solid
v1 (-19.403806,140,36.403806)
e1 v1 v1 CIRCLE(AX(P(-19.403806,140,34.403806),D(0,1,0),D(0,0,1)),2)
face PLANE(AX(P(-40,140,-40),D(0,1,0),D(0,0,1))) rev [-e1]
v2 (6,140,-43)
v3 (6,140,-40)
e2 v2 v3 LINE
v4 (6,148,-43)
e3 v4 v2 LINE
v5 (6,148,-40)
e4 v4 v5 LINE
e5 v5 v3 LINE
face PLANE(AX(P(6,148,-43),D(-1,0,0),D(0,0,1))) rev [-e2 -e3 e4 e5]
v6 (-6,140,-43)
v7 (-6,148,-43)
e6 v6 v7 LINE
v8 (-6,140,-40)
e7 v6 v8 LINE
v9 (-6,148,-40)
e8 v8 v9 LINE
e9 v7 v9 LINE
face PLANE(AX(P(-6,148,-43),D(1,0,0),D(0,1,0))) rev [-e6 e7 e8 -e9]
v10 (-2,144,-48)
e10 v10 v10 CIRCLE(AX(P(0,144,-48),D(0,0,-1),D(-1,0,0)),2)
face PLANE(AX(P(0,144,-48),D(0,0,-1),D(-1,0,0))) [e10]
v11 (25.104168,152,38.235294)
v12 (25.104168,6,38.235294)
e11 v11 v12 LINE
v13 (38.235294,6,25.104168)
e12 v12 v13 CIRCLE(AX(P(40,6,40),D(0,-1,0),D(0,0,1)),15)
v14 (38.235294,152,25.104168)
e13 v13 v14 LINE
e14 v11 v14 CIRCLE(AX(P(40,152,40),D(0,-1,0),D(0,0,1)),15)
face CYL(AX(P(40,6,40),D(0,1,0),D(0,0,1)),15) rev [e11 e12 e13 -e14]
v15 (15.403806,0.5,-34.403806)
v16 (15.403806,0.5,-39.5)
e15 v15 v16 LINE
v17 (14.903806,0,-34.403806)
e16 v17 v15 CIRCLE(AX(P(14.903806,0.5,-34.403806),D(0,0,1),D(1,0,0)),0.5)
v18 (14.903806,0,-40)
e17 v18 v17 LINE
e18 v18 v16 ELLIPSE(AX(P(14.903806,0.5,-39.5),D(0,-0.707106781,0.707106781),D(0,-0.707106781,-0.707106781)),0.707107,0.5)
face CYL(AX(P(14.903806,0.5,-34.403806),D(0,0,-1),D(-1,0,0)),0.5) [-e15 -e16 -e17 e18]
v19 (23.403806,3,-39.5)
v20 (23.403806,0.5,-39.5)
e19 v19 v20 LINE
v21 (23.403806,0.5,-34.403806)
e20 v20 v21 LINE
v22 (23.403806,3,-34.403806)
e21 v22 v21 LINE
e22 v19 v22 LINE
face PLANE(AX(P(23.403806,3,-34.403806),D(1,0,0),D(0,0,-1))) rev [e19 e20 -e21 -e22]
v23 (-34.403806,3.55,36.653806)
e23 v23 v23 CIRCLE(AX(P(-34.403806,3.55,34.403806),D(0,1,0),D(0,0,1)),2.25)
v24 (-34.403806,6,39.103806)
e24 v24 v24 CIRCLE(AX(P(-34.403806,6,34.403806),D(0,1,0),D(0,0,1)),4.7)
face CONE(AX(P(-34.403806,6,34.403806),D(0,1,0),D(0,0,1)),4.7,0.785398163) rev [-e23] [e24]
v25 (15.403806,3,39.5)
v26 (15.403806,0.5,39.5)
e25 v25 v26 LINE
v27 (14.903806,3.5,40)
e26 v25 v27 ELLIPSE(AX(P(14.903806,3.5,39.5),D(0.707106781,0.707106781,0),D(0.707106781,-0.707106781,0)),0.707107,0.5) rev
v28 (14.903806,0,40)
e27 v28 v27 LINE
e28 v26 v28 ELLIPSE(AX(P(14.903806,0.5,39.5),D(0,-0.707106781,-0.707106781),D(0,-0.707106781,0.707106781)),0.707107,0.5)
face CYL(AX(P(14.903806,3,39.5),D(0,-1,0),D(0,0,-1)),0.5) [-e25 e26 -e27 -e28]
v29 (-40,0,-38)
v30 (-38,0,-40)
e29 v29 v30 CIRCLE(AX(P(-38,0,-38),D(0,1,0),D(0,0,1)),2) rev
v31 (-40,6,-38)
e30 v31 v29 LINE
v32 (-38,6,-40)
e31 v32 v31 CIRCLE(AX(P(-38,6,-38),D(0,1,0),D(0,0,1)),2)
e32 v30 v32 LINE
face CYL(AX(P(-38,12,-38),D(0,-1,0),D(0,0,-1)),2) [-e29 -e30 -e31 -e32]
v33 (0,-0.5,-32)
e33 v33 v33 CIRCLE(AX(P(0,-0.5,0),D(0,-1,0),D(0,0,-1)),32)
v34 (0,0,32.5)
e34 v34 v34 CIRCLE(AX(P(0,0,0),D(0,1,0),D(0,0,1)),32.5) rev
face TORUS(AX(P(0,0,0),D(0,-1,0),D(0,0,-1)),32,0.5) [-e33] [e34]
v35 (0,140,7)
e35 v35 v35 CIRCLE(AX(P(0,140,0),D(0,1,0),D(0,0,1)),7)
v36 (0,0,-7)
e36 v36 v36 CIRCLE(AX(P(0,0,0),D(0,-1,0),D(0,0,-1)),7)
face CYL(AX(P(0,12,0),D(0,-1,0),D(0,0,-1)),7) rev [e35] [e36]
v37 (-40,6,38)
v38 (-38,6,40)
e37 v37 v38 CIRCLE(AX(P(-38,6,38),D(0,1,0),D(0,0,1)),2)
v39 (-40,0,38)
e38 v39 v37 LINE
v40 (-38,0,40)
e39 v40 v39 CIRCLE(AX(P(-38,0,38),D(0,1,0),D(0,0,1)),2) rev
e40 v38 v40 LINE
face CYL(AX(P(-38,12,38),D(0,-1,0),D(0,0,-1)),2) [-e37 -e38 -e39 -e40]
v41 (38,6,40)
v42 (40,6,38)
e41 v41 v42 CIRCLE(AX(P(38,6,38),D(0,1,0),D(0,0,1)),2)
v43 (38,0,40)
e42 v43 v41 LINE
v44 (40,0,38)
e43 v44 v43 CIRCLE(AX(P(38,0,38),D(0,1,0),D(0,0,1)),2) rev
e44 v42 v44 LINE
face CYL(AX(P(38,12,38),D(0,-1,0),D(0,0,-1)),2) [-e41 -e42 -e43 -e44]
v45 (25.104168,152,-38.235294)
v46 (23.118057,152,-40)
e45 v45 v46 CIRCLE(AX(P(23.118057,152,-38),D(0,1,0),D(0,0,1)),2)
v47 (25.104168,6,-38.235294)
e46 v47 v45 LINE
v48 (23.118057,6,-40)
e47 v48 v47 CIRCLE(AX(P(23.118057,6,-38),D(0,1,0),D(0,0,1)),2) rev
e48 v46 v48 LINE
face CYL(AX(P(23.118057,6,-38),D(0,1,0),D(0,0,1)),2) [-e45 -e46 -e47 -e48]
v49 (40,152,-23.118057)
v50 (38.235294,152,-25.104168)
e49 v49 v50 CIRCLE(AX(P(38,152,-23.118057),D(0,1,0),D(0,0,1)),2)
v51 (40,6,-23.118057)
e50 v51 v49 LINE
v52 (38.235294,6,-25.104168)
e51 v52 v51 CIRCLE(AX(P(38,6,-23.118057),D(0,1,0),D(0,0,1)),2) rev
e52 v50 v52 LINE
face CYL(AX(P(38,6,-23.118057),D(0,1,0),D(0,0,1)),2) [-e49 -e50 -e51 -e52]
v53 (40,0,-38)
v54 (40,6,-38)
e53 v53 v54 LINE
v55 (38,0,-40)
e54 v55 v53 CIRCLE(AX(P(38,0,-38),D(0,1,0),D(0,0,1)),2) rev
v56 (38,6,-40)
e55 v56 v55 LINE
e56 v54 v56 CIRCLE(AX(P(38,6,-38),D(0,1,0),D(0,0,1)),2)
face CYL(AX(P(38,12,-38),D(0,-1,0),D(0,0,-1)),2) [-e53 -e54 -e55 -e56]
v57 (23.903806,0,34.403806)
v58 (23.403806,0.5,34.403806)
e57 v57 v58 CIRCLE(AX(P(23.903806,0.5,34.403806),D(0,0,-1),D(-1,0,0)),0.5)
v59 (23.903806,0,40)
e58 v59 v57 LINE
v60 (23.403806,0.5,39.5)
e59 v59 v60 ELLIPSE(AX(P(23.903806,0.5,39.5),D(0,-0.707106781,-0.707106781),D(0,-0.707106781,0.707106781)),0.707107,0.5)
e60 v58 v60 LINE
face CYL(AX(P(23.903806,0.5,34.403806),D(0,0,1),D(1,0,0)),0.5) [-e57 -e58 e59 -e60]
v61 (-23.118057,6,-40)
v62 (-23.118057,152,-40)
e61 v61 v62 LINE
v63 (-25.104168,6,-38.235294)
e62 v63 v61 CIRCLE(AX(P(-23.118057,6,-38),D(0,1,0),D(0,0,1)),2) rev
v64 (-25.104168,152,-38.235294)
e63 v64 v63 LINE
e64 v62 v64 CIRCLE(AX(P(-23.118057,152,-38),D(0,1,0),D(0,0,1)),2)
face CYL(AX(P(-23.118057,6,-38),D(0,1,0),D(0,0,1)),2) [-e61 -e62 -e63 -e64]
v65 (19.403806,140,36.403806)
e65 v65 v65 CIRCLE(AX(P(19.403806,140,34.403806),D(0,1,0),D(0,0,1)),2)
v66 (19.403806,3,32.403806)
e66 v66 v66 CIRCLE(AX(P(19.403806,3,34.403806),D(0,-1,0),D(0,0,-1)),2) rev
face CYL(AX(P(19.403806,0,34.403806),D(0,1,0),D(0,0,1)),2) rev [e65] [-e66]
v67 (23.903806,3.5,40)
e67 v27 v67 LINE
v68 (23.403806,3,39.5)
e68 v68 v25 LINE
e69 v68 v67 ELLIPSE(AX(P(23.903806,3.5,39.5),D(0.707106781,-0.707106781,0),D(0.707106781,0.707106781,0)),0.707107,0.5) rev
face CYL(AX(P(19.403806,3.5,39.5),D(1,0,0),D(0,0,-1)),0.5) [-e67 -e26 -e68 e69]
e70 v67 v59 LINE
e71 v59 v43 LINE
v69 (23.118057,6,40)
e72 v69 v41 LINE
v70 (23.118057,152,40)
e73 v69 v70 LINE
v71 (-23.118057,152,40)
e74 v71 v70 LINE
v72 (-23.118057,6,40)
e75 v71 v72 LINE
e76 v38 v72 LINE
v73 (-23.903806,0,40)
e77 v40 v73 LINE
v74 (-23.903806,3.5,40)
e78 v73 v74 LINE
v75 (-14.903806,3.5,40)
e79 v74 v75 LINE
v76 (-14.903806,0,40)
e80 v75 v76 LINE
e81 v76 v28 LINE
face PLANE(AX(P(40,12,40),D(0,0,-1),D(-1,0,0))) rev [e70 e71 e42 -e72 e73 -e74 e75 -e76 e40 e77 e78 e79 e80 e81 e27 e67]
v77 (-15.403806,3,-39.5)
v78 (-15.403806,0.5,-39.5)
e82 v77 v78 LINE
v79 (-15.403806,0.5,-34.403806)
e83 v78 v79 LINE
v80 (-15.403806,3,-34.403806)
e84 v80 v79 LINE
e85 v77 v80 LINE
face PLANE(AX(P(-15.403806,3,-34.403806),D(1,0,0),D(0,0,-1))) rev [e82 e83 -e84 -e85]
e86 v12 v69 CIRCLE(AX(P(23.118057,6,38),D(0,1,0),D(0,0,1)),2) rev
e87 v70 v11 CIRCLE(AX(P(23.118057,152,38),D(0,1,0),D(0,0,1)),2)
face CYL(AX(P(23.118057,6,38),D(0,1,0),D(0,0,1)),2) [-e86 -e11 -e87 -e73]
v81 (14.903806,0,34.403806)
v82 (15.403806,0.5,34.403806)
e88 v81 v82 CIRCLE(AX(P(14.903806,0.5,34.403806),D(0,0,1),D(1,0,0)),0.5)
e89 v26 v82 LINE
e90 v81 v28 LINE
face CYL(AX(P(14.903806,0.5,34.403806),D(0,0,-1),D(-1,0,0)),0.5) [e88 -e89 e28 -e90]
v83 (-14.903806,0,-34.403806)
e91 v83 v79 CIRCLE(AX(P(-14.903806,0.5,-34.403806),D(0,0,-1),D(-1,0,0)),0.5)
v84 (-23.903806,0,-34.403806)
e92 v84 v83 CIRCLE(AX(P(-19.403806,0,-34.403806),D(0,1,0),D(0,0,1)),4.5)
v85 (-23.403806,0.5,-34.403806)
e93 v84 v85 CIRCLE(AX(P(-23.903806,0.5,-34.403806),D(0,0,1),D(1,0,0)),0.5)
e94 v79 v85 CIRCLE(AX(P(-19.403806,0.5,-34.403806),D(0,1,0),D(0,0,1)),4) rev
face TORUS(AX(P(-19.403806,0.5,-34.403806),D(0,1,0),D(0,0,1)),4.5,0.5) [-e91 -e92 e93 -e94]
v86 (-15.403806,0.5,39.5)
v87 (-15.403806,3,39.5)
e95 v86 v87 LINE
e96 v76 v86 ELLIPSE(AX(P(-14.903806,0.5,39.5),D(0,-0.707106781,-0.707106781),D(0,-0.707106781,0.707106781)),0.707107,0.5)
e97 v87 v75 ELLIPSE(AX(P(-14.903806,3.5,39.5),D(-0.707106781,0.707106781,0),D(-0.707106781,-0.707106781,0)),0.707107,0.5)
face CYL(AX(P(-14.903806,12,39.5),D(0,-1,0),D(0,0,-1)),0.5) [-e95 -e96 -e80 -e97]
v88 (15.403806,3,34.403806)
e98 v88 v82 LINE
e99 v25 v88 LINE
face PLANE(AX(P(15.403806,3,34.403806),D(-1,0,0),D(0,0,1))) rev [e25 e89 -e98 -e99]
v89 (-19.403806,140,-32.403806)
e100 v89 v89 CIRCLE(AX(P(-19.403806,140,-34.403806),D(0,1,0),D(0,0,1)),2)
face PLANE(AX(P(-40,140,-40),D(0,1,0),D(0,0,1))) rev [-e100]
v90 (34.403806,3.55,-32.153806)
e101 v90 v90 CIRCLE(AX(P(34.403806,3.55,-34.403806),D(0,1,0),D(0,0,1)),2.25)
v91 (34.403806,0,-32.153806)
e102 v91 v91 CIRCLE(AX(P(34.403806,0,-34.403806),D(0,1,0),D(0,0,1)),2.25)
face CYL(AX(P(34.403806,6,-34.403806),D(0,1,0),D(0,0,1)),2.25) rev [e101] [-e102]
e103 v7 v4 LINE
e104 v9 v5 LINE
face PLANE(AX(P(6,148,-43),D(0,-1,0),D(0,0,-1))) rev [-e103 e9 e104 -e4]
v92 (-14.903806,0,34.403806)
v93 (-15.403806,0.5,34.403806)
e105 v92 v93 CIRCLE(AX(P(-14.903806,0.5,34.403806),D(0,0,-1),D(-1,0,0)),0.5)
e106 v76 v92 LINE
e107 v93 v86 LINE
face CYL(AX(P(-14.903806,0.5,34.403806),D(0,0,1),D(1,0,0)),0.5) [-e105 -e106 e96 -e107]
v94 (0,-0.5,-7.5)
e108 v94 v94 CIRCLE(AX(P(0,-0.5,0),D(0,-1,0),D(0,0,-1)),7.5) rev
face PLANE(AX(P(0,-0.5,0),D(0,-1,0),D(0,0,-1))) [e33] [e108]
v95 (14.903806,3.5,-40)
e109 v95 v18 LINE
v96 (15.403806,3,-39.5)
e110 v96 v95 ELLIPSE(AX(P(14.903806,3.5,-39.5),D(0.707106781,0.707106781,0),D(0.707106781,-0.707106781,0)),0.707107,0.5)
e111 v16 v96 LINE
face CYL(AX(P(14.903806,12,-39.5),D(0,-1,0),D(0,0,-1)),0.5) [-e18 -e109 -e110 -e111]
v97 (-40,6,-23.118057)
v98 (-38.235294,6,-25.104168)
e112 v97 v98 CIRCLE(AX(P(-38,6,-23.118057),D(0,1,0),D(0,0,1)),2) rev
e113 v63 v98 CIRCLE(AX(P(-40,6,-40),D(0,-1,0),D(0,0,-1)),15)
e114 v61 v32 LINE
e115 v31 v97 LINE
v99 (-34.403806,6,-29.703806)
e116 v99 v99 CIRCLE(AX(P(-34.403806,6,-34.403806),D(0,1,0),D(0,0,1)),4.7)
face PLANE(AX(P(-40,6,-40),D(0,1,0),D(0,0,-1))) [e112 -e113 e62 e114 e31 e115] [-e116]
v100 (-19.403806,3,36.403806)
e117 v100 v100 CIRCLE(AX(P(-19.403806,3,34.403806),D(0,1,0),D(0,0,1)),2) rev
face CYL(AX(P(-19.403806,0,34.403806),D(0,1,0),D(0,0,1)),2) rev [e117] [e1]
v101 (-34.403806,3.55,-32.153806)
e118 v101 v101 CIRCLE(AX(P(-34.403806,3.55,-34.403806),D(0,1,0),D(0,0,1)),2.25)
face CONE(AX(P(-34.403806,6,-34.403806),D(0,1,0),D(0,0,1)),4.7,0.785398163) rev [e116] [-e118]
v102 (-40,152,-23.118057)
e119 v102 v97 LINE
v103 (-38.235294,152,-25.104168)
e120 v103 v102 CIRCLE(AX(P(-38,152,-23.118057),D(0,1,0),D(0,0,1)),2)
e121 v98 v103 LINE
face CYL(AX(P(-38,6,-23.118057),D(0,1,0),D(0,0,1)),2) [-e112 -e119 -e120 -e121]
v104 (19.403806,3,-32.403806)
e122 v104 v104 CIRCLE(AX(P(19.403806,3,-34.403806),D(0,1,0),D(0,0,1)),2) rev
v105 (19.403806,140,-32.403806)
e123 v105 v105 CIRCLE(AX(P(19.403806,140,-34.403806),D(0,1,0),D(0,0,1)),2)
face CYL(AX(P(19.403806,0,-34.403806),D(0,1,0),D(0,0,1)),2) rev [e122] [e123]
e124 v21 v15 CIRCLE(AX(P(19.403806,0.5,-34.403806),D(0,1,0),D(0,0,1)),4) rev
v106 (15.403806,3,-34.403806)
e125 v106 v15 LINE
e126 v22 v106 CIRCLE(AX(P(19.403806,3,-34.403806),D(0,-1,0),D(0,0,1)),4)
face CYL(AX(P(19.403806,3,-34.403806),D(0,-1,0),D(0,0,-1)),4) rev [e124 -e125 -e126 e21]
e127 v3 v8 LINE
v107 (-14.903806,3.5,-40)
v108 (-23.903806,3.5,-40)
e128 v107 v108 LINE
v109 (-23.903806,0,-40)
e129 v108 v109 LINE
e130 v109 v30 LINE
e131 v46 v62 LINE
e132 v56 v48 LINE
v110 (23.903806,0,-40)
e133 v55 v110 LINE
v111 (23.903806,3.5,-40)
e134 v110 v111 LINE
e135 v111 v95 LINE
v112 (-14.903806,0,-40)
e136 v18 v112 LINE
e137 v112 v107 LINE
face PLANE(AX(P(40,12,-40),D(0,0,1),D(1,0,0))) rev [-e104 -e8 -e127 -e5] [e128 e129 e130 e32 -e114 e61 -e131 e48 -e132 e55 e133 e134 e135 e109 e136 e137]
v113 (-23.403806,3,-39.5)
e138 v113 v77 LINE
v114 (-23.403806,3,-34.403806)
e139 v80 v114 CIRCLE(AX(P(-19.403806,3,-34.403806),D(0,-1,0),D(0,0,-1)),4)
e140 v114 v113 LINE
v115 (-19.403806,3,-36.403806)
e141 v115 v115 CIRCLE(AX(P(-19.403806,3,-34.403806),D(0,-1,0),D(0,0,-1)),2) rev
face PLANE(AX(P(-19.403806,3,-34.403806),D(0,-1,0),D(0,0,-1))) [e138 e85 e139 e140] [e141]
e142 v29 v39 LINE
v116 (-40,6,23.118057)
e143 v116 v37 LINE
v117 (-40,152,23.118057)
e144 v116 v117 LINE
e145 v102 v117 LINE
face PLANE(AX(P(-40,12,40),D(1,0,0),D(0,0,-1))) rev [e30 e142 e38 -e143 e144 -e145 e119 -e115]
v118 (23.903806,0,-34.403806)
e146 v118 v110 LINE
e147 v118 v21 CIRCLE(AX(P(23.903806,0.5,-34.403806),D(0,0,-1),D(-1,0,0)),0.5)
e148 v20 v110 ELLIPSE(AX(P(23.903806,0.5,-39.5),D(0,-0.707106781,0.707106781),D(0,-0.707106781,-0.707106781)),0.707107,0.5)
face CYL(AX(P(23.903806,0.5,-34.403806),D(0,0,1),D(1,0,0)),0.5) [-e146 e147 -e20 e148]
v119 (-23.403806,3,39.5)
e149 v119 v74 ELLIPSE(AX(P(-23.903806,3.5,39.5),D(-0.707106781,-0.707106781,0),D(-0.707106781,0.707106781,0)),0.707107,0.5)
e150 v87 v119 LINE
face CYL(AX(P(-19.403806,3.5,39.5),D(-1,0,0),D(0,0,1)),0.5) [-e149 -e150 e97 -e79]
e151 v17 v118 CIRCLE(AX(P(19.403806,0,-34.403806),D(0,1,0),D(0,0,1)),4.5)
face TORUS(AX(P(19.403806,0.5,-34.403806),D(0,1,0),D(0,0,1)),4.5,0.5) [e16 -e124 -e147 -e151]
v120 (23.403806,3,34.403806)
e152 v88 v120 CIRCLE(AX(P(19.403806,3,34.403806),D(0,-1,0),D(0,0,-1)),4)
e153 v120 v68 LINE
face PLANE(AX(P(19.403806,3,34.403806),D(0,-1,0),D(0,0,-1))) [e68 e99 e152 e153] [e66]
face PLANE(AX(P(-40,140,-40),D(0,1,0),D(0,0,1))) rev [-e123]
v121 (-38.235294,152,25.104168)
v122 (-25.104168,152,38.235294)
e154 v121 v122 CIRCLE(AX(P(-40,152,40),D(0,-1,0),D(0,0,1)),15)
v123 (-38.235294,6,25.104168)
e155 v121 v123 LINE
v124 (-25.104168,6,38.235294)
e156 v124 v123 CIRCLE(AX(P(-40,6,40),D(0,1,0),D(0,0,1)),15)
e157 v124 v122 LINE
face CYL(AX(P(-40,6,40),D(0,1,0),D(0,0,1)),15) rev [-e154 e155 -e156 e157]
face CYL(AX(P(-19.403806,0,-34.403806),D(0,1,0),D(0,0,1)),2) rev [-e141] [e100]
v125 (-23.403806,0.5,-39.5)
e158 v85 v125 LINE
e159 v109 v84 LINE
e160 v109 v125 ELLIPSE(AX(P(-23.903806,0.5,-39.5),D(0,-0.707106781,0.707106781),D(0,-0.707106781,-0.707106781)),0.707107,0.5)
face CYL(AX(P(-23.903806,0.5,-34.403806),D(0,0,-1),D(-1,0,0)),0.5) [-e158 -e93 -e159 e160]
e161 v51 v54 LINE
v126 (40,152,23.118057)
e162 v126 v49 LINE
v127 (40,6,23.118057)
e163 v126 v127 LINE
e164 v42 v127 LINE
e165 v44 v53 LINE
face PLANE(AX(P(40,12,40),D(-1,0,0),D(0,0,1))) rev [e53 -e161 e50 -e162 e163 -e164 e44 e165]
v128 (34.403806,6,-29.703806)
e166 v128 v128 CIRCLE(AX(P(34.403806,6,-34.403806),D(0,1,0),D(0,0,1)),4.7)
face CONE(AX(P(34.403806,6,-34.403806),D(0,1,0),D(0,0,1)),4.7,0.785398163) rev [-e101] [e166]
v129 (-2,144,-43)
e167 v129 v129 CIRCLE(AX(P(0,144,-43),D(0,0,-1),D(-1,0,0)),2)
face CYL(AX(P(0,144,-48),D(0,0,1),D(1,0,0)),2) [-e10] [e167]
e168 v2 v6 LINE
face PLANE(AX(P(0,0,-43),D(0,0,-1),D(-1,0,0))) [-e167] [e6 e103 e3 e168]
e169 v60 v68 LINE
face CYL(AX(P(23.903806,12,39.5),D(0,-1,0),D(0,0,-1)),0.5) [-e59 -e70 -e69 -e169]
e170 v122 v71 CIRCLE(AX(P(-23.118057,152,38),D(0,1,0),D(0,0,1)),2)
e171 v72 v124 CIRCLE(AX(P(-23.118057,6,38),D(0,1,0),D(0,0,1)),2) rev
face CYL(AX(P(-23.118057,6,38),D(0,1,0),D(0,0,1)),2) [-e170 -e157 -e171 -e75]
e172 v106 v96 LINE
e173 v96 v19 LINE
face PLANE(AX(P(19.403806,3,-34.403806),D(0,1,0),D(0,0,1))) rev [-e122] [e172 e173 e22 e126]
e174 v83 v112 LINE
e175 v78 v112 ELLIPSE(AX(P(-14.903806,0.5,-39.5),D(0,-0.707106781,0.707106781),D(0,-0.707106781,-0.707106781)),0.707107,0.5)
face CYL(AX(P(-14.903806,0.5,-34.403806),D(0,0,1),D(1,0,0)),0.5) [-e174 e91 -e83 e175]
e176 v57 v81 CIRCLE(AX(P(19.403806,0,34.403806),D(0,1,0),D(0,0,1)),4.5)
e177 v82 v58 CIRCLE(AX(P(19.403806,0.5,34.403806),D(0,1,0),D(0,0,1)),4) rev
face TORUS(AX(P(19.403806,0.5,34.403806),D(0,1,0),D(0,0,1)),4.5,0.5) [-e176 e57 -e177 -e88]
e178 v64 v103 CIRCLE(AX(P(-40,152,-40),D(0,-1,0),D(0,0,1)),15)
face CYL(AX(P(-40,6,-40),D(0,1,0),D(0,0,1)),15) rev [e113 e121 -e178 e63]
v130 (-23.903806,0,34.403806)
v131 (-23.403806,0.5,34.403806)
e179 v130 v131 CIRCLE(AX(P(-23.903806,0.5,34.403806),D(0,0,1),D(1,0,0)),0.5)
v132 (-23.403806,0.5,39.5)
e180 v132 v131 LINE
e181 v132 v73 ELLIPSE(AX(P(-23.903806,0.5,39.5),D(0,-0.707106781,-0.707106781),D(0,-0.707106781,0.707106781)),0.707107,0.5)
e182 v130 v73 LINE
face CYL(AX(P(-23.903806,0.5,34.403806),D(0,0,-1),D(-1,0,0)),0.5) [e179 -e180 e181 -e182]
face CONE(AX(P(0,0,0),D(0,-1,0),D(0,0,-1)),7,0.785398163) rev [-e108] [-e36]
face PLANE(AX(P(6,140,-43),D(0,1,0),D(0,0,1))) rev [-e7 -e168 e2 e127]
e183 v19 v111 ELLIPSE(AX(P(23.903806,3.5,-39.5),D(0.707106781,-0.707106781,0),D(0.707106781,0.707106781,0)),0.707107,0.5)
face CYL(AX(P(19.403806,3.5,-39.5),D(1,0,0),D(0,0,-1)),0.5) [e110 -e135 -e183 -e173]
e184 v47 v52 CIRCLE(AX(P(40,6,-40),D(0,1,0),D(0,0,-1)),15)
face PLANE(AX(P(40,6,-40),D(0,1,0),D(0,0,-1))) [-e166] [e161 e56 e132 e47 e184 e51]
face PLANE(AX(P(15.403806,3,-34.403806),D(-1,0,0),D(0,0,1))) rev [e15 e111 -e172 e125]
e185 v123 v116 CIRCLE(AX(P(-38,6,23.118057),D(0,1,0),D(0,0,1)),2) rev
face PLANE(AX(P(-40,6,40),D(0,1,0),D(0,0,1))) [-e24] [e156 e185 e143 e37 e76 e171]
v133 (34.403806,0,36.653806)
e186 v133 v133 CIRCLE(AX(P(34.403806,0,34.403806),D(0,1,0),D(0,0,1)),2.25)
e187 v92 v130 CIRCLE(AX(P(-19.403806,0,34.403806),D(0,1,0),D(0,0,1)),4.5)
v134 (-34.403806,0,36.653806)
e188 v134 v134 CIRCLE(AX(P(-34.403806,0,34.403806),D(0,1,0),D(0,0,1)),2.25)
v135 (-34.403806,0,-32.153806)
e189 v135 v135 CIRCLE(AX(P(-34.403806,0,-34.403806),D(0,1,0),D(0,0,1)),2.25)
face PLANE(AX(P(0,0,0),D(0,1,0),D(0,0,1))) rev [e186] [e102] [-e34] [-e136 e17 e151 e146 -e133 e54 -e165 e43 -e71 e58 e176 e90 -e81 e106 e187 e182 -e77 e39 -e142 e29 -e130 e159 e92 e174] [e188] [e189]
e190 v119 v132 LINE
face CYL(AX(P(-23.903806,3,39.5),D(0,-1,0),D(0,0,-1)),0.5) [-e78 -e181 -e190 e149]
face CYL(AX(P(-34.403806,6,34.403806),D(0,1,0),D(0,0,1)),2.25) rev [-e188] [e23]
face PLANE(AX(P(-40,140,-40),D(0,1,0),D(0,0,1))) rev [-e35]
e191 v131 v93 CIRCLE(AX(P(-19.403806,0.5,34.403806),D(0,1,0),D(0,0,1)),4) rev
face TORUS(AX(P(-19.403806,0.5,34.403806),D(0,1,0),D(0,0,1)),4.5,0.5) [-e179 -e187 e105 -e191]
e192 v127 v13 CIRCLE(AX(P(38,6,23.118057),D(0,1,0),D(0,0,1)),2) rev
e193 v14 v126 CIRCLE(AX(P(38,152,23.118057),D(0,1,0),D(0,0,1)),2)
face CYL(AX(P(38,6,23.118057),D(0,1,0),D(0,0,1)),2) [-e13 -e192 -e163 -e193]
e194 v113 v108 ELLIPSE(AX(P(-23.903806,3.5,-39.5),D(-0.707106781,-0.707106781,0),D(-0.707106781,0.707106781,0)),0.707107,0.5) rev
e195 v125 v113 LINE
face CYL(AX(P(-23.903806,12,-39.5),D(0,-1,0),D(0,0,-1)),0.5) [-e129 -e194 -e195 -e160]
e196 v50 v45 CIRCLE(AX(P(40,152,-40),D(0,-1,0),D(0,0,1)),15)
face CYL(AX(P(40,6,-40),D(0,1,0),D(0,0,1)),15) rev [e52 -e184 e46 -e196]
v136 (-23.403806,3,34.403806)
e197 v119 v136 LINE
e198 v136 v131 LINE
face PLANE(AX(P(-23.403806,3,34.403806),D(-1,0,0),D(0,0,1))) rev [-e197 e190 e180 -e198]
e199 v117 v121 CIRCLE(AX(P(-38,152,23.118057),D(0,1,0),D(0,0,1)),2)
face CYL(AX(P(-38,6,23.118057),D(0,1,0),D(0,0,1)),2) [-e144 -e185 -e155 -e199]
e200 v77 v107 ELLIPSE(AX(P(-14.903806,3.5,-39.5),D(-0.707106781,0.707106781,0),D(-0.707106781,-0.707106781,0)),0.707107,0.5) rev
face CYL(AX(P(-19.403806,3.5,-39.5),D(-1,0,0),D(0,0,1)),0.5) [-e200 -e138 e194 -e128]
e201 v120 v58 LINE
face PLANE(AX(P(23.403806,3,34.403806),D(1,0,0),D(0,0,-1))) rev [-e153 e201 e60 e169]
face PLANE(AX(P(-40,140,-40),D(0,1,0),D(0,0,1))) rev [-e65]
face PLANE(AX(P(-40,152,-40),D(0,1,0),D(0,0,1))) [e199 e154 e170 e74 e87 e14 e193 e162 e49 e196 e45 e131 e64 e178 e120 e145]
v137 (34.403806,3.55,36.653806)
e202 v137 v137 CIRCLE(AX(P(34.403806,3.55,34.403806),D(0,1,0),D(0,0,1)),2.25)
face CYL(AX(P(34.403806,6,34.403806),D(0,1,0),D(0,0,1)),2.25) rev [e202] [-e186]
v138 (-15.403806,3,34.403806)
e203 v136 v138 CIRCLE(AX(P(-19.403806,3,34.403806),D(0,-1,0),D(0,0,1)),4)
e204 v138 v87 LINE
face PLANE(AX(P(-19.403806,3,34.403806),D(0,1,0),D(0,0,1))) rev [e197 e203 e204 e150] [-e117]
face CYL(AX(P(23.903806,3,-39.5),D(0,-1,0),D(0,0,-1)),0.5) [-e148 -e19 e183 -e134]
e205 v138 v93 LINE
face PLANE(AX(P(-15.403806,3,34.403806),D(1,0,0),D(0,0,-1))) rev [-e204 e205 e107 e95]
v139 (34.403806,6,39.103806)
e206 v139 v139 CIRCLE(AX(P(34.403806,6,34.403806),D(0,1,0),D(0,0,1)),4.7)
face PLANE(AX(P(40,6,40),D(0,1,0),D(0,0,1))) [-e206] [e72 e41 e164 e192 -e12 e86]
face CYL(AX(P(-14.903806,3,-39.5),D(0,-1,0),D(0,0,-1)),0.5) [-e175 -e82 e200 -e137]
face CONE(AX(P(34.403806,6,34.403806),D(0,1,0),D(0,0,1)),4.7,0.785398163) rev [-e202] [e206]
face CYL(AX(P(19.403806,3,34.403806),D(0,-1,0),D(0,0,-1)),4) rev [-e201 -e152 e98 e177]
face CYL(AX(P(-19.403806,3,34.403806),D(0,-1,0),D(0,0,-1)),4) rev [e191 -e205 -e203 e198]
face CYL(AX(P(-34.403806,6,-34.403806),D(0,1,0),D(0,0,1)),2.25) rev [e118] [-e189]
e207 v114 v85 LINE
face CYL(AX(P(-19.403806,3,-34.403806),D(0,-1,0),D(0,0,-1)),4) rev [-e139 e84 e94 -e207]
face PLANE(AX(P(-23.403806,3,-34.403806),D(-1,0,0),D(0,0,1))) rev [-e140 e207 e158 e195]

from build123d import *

# Parameters (mm, degrees)
SZKIC1_W                    = 80
SZKIC1_H                    = 80
DODANIE_WYCI_GNI_CIE1_DEPTH = 12
SZKIC2_R                    = 15
WYTNIJ_WYCI_GNI_CIE1_DEPTH  = 6
LUSTRO2_COPY_1_SKETCH_R     = 15
LUSTRO2_COPY_1_DEPTH        = 6
ZAOKR_GLENIE1_R             = 2
SZKIC8_R                    = 2
WYTNIJ_WYCI_GNI_CIE2_DEPTH  = 58.827329179
WYTNIJ_WYCI_GNI_CIE3_DEPTH  = 3
ZAOKR_GLENIE2_R             = 0.5
SZKIC10_R                   = 32.5
DODANIE_WYCI_GNI_CIE2_DEPTH = 0.5
ZAOKR_GLENIE3_R             = 0.5
SZKIC11_R                   = 7
WYTNIJ_WYCI_GNI_CIE4_DEPTH  = 58.933151131
SFAZOWANIE1_SIZE            = 0.5
DODANIE_WYCI_GNI_CIE3_START = 128
SZKIC12_R                   = 7
SZKIC12_R_2                 = 2
DODANIE_WYCI_GNI_CIE3_DEPTH = 128
DODANIE_WYCI_GNI_CIE4_START = 12
DODANIE_WYCI_GNI_CIE4_DEPTH = 12
SZKIC16_W                   = 12
SZKIC16_H                   = 8
DODANIE_WYCI_GNI_CIE5_DEPTH = 3
SZKIC17_R                   = 2
DODANIE_WYCI_GNI_CIE6_DEPTH = 5


with BuildPart() as part:
    # Szkic1 → Dodanie-wyciągnięcie1 (new body)
    with BuildSketch(Plane(origin=(0, 0, 0), x_dir=(1, 0, 0), z_dir=(0, 1, 0))):
        Rectangle(SZKIC1_W, SZKIC1_H)
    extrude(amount=DODANIE_WYCI_GNI_CIE1_DEPTH)

    # Szkic2 → Wytnij-wyciągnięcie1 (cut)
    with BuildSketch(Plane(origin=(0, 12, 0), x_dir=(1, 0, 0), z_dir=(0, 1, 0))):
        with Locations((-40, -40)):
            Circle(SZKIC2_R)
    wytnij_wyci_gni_cie1 = extrude(amount=-WYTNIJ_WYCI_GNI_CIE1_DEPTH, mode=Mode.SUBTRACT)

    # Lustro1: Wytnij-wyciągnięcie1 across plane
    add(wytnij_wyci_gni_cie1.mirror(Plane(origin=(0, 0, 0), x_dir=(0, 0, 1), z_dir=(1, 0, 0))), mode=Mode.SUBTRACT)

    # Lustro2: Wytnij-wyciągnięcie1 across plane
    add(wytnij_wyci_gni_cie1.mirror(Plane.XY), mode=Mode.SUBTRACT)

    # Lustro2 copy 1 sketch → Lustro2 copy 1 (cut)
    with BuildSketch(Plane(origin=(0, 12, 0), x_dir=(-1, 0, 0), z_dir=(0, 1, 0))):
        with Locations((-40, -40)):
            Circle(LUSTRO2_COPY_1_SKETCH_R)
    extrude(amount=-LUSTRO2_COPY_1_DEPTH, mode=Mode.SUBTRACT)

    # Zaokrąglenie1
    zaokr_glenie1_edges = [part.edges().sort_by_distance(p)[0] for p in [
        (-40, 3, 40),
        (-40, 9, 25),
        (-25, 9, 40),
        (40, 3, 40),
        (25, 9, 40),
        (40, 9, 25),
        (40, 3, -40),
        (40, 9, -25),
        (25, 9, -40),
        (-40, 3, -40),
        (-40, 9, -25),
        (-25, 9, -40),
    ]]
    fillet(zaokr_glenie1_edges, radius=ZAOKR_GLENIE1_R)

    # Szkic5 → Pogłębienie stożkowe pod M4 Wkręt z łbem płaskim1 (revolve, cut)
    with BuildSketch(Plane(origin=(-34.403805922, 6, -34.403805922), x_dir=(0, 0, 1), z_dir=(1, 0, 0))):
        Polygon((0, 0), (0, 17.031936393), (2.25, 15.68), (2.25, 2.45), (4.7, 0), align=None)
    pog_bienie_sto_kowe_pod_m4_wkr_t_z_bem = revolve(axis=Axis((-34.403805922, 12.35, -34.403805922), (0, -1, 0)), mode=Mode.SUBTRACT)

    # Lustro3: Pogłębienie stożkowe pod M4 Wkręt z łbem płaskim1 across plane
    add(pog_bienie_sto_kowe_pod_m4_wkr_t_z_bem.mirror(Plane.XY), mode=Mode.SUBTRACT)

    # Lustro4: Pogłębienie stożkowe pod M4 Wkręt z łbem płaskim1 across plane
    add(pog_bienie_sto_kowe_pod_m4_wkr_t_z_bem.mirror(Plane(origin=(0, 0, 0), x_dir=(0, 0, 1), z_dir=(1, 0, 0))), mode=Mode.SUBTRACT)

    # Lustro4 copy 1 sketch → Lustro4 copy 1 (revolve, cut)
    with BuildSketch(Plane(origin=(34.403805922, 6, 34.403805922), x_dir=(0, 0, -1), z_dir=(-1, 0, 0))):
        Polygon((0, 0), (0, 17.031936393), (2.25, 15.68), (2.25, 2.45), (4.7, 0), align=None)
    revolve(axis=Axis((34.403805922, 12.35, 34.403805922), (0, -1, 0)), mode=Mode.SUBTRACT)

    # Szkic8 → Wytnij-wyciągnięcie2 (cut, through all)
    with BuildSketch(Plane(origin=(0, 12, 0), x_dir=(1, 0, 0), z_dir=(0, 1, 0))):
        with Locations(Location((-19.403805922, 34.403805922, 0), (0, 0, 270))):
            Circle(SZKIC8_R)
        with Locations(Location((-19.403805922, -34.403805922, 0), (0, 0, 90))):
            Circle(SZKIC8_R)
        with Locations(Location((19.403805922, 34.403805922, 0), (0, 0, 90))):
            Circle(SZKIC8_R)
        with Locations(Location((19.403805922, -34.403805922, 0), (0, 0, 270))):
            Circle(SZKIC8_R)
    extrude(amount=-WYTNIJ_WYCI_GNI_CIE2_DEPTH, mode=Mode.SUBTRACT)

    # Szkic9 → Wytnij-wyciągnięcie3 (cut)
    with BuildSketch(Plane.XZ):
        with BuildLine():
            Line((15.403805922, 34.403805922), (15.403805922, 40))
            Line((15.403805922, 40), (23.403805922, 40))
            Line((23.403805922, 40), (23.403805922, 34.403805922))
            ThreePointArc((23.403805922, 34.403805922), (19.403805922, 30.403805922), (15.403805922, 34.403805922))
        make_face()
        with BuildLine():
            Line((-23.403805922, 34.403805922), (-23.403805922, 40))
            Line((-23.403805922, 40), (-15.403805922, 40))
            Line((-15.403805922, 40), (-15.403805922, 34.403805922))
            ThreePointArc((-15.403805922, 34.403805922), (-19.403805922, 30.403805922), (-23.403805922, 34.403805922))
        make_face()
        with BuildLine():
            Line((23.403805922, -34.403805922), (23.403805922, -40))
            Line((23.403805922, -40), (15.403805922, -40))
            Line((15.403805922, -40), (15.403805922, -34.403805922))
            ThreePointArc((15.403805922, -34.403805922), (19.403805922, -30.403805922), (23.403805922, -34.403805922))
        make_face()
        with BuildLine():
            Line((-15.403805922, -34.403805922), (-15.403805922, -40))
            Line((-15.403805922, -40), (-23.403805922, -40))
            Line((-23.403805922, -40), (-23.403805922, -34.403805922))
            ThreePointArc((-23.403805922, -34.403805922), (-19.403805922, -30.403805922), (-15.403805922, -34.403805922))
        make_face()
    extrude(amount=-WYTNIJ_WYCI_GNI_CIE3_DEPTH, mode=Mode.SUBTRACT)

    # Zaokrąglenie2
    zaokr_glenie2_edges = [part.edges().sort_by_distance(p)[0] for p in [
        (-19.403805922, 0, 30.403805922),
        (-15.403805922, 0, 37.201902961),
        (-23.403805922, 0, 37.201902961),
        (-19.403805922, 3, 40),
        (-23.403805922, 1.5, 40),
        (-15.403805922, 1.5, 40),
        (19.403805922, 0, -30.403805922),
        (15.403805922, 0, -37.201902961),
        (23.403805922, 0, -37.201902961),
        (19.403805922, 3, -40),
        (23.403805922, 1.5, -40),
        (15.403805922, 1.5, -40),
        (-19.403805922, 0, -30.403805922),
        (-23.403805922, 0, -37.201902961),
        (-15.403805922, 0, -37.201902961),
        (-19.403805922, 3, -40),
        (-15.403805922, 1.5, -40),
        (-23.403805922, 1.5, -40),
        (19.403805922, 0, 30.403805922),
        (23.403805922, 0, 37.201902961),
        (15.403805922, 0, 37.201902961),
        (19.403805922, 3, 40),
        (15.403805922, 1.5, 40),
        (23.403805922, 1.5, 40),
    ]]
    fillet(zaokr_glenie2_edges, radius=ZAOKR_GLENIE2_R)

    # Szkic10 → Dodanie-wyciągnięcie2 (add)
    with BuildSketch(Plane.XZ):
        with Locations(Location((0, 0, 0), (0, 0, 90))):
            Circle(SZKIC10_R)
    extrude(amount=DODANIE_WYCI_GNI_CIE2_DEPTH)

    # Zaokrąglenie3
    zaokr_glenie3_edges = [part.edges().sort_by_distance(p)[0] for p in [
        (0, -0.5, -32.5),
    ]]
    fillet(zaokr_glenie3_edges, radius=ZAOKR_GLENIE3_R - 0.0001)  # a hair under: the kernel refuses the full size

    # Szkic11 → Wytnij-wyciągnięcie4 (cut, through all)
    with BuildSketch(Plane.XZ.offset(0.5)):
        with Locations(Location((0, 0, 0), (0, 0, 270))):
            Circle(SZKIC11_R)
    extrude(amount=-WYTNIJ_WYCI_GNI_CIE4_DEPTH, mode=Mode.SUBTRACT)

    # Sfazowanie1
    sfazowanie1_edges = [part.edges().sort_by_distance(p)[0] for p in [
        (0, -0.5, 7),
    ]]
    chamfer(sfazowanie1_edges, length=SFAZOWANIE1_SIZE)

    # Szkic12 → Dodanie-wyciągnięcie3 (add)
    with BuildSketch(Plane(origin=(0, 12, 0), x_dir=(1, 0, 0), z_dir=(0, 1, 0)).offset(DODANIE_WYCI_GNI_CIE3_START)):
        with BuildLine():
            Line((-40, 23.118056984), (-40, -23.118056984))
            ThreePointArc((-40, -23.118056984), (-39.495090003, -24.446479312), (-38.235294118, -25.104167927))
            ThreePointArc((-38.235294118, -25.104167927), (-29.393398282, -29.393398282), (-25.104167927, -38.235294118))
            ThreePointArc((-25.104167927, -38.235294118), (-24.446479312, -39.495090003), (-23.118056984, -40))
            Line((-23.118056984, -40), (23.118056984, -40))
            ThreePointArc((23.118056984, -40), (24.446479312, -39.495090003), (25.104167927, -38.235294118))
            ThreePointArc((25.104167927, -38.235294118), (29.393398282, -29.393398282), (38.235294118, -25.104167927))
            ThreePointArc((38.235294118, -25.104167927), (39.495090003, -24.446479312), (40, -23.118056984))
            Line((40, -23.118056984), (40, 23.118056984))
            ThreePointArc((40, 23.118056984), (39.495090003, 24.446479312), (38.235294118, 25.104167927))
            ThreePointArc((38.235294118, 25.104167927), (29.393398282, 29.393398282), (25.104167927, 38.235294118))
            ThreePointArc((25.104167927, 38.235294118), (24.446479312, 39.495090003), (23.118056984, 40))
            Line((23.118056984, 40), (-23.118056984, 40))
            ThreePointArc((-23.118056984, 40), (-24.446479312, 39.495090003), (-25.104167927, 38.235294118))
            ThreePointArc((-25.104167927, 38.235294118), (-29.393398282, 29.393398282), (-38.235294118, 25.104167927))
            ThreePointArc((-38.235294118, 25.104167927), (-39.495090003, 24.446479312), (-40, 23.118056984))
        make_face()
        with Locations(Location((0, 0, 0), (0, 0, 90))):
            Circle(SZKIC12_R, mode=Mode.SUBTRACT)
        with Locations(Location((-19.403805922, -34.403805922, 0), (0, 0, 270))):
            Circle(SZKIC12_R_2, mode=Mode.SUBTRACT)
        with Locations(Location((19.403805922, -34.403805922, 0), (0, 0, 270))):
            Circle(SZKIC12_R_2, mode=Mode.SUBTRACT)
        with Locations(Location((19.403805922, 34.403805922, 0), (0, 0, 270))):
            Circle(SZKIC12_R_2, mode=Mode.SUBTRACT)
        with Locations(Location((-19.403805922, 34.403805922, 0), (0, 0, 270))):
            Circle(SZKIC12_R_2, mode=Mode.SUBTRACT)
    extrude(amount=-DODANIE_WYCI_GNI_CIE3_DEPTH)

    # Szkic15 → Dodanie-wyciągnięcie4 (add)
    with BuildSketch(Plane(origin=(0, 140, 0), x_dir=(1, 0, 0), z_dir=(0, 1, 0)).offset(DODANIE_WYCI_GNI_CIE4_START)):
        with BuildLine():
            Line((-40, 23.118056984), (-40, -23.118056984))
            ThreePointArc((-40, -23.118056984), (-39.495090003, -24.446479312), (-38.235294118, -25.104167927))
            ThreePointArc((-38.235294118, -25.104167927), (-29.393398282, -29.393398282), (-25.104167927, -38.235294118))
            ThreePointArc((-25.104167927, -38.235294118), (-24.446479312, -39.495090003), (-23.118056984, -40))
            Line((-23.118056984, -40), (23.118056984, -40))
            ThreePointArc((23.118056984, -40), (24.446479312, -39.495090003), (25.104167927, -38.235294118))
            ThreePointArc((25.104167927, -38.235294118), (29.393398282, -29.393398282), (38.235294118, -25.104167927))
            ThreePointArc((38.235294118, -25.104167927), (39.495090003, -24.446479312), (40, -23.118056984))
            Line((40, -23.118056984), (40, 23.118056984))
            ThreePointArc((40, 23.118056984), (39.495090003, 24.446479312), (38.235294118, 25.104167927))
            ThreePointArc((38.235294118, 25.104167927), (29.393398282, 29.393398282), (25.104167927, 38.235294118))
            ThreePointArc((25.104167927, 38.235294118), (24.446479312, 39.495090003), (23.118056984, 40))
            Line((23.118056984, 40), (-23.118056984, 40))
            ThreePointArc((-23.118056984, 40), (-24.446479312, 39.495090003), (-25.104167927, 38.235294118))
            ThreePointArc((-25.104167927, 38.235294118), (-29.393398282, 29.393398282), (-38.235294118, 25.104167927))
            ThreePointArc((-38.235294118, 25.104167927), (-39.495090003, 24.446479312), (-40, 23.118056984))
        make_face()
    extrude(amount=-DODANIE_WYCI_GNI_CIE4_DEPTH)

    # Szkic16 → Dodanie-wyciągnięcie5 (add)
    with BuildSketch(Plane(origin=(0, 0, -40), x_dir=(-1, 0, 0), z_dir=(0, 0, -1))):
        with Locations((0, 144)):
            Rectangle(SZKIC16_W, SZKIC16_H)
    extrude(amount=DODANIE_WYCI_GNI_CIE5_DEPTH)

    # Szkic17 → Dodanie-wyciągnięcie6 (add)
    with BuildSketch(Plane(origin=(0, 0, -43), x_dir=(-1, 0, 0), z_dir=(0, 0, -1))):
        with Locations((0, 144)):
            Circle(SZKIC17_R)
    extrude(amount=DODANIE_WYCI_GNI_CIE6_DEPTH)


solid = part.part
